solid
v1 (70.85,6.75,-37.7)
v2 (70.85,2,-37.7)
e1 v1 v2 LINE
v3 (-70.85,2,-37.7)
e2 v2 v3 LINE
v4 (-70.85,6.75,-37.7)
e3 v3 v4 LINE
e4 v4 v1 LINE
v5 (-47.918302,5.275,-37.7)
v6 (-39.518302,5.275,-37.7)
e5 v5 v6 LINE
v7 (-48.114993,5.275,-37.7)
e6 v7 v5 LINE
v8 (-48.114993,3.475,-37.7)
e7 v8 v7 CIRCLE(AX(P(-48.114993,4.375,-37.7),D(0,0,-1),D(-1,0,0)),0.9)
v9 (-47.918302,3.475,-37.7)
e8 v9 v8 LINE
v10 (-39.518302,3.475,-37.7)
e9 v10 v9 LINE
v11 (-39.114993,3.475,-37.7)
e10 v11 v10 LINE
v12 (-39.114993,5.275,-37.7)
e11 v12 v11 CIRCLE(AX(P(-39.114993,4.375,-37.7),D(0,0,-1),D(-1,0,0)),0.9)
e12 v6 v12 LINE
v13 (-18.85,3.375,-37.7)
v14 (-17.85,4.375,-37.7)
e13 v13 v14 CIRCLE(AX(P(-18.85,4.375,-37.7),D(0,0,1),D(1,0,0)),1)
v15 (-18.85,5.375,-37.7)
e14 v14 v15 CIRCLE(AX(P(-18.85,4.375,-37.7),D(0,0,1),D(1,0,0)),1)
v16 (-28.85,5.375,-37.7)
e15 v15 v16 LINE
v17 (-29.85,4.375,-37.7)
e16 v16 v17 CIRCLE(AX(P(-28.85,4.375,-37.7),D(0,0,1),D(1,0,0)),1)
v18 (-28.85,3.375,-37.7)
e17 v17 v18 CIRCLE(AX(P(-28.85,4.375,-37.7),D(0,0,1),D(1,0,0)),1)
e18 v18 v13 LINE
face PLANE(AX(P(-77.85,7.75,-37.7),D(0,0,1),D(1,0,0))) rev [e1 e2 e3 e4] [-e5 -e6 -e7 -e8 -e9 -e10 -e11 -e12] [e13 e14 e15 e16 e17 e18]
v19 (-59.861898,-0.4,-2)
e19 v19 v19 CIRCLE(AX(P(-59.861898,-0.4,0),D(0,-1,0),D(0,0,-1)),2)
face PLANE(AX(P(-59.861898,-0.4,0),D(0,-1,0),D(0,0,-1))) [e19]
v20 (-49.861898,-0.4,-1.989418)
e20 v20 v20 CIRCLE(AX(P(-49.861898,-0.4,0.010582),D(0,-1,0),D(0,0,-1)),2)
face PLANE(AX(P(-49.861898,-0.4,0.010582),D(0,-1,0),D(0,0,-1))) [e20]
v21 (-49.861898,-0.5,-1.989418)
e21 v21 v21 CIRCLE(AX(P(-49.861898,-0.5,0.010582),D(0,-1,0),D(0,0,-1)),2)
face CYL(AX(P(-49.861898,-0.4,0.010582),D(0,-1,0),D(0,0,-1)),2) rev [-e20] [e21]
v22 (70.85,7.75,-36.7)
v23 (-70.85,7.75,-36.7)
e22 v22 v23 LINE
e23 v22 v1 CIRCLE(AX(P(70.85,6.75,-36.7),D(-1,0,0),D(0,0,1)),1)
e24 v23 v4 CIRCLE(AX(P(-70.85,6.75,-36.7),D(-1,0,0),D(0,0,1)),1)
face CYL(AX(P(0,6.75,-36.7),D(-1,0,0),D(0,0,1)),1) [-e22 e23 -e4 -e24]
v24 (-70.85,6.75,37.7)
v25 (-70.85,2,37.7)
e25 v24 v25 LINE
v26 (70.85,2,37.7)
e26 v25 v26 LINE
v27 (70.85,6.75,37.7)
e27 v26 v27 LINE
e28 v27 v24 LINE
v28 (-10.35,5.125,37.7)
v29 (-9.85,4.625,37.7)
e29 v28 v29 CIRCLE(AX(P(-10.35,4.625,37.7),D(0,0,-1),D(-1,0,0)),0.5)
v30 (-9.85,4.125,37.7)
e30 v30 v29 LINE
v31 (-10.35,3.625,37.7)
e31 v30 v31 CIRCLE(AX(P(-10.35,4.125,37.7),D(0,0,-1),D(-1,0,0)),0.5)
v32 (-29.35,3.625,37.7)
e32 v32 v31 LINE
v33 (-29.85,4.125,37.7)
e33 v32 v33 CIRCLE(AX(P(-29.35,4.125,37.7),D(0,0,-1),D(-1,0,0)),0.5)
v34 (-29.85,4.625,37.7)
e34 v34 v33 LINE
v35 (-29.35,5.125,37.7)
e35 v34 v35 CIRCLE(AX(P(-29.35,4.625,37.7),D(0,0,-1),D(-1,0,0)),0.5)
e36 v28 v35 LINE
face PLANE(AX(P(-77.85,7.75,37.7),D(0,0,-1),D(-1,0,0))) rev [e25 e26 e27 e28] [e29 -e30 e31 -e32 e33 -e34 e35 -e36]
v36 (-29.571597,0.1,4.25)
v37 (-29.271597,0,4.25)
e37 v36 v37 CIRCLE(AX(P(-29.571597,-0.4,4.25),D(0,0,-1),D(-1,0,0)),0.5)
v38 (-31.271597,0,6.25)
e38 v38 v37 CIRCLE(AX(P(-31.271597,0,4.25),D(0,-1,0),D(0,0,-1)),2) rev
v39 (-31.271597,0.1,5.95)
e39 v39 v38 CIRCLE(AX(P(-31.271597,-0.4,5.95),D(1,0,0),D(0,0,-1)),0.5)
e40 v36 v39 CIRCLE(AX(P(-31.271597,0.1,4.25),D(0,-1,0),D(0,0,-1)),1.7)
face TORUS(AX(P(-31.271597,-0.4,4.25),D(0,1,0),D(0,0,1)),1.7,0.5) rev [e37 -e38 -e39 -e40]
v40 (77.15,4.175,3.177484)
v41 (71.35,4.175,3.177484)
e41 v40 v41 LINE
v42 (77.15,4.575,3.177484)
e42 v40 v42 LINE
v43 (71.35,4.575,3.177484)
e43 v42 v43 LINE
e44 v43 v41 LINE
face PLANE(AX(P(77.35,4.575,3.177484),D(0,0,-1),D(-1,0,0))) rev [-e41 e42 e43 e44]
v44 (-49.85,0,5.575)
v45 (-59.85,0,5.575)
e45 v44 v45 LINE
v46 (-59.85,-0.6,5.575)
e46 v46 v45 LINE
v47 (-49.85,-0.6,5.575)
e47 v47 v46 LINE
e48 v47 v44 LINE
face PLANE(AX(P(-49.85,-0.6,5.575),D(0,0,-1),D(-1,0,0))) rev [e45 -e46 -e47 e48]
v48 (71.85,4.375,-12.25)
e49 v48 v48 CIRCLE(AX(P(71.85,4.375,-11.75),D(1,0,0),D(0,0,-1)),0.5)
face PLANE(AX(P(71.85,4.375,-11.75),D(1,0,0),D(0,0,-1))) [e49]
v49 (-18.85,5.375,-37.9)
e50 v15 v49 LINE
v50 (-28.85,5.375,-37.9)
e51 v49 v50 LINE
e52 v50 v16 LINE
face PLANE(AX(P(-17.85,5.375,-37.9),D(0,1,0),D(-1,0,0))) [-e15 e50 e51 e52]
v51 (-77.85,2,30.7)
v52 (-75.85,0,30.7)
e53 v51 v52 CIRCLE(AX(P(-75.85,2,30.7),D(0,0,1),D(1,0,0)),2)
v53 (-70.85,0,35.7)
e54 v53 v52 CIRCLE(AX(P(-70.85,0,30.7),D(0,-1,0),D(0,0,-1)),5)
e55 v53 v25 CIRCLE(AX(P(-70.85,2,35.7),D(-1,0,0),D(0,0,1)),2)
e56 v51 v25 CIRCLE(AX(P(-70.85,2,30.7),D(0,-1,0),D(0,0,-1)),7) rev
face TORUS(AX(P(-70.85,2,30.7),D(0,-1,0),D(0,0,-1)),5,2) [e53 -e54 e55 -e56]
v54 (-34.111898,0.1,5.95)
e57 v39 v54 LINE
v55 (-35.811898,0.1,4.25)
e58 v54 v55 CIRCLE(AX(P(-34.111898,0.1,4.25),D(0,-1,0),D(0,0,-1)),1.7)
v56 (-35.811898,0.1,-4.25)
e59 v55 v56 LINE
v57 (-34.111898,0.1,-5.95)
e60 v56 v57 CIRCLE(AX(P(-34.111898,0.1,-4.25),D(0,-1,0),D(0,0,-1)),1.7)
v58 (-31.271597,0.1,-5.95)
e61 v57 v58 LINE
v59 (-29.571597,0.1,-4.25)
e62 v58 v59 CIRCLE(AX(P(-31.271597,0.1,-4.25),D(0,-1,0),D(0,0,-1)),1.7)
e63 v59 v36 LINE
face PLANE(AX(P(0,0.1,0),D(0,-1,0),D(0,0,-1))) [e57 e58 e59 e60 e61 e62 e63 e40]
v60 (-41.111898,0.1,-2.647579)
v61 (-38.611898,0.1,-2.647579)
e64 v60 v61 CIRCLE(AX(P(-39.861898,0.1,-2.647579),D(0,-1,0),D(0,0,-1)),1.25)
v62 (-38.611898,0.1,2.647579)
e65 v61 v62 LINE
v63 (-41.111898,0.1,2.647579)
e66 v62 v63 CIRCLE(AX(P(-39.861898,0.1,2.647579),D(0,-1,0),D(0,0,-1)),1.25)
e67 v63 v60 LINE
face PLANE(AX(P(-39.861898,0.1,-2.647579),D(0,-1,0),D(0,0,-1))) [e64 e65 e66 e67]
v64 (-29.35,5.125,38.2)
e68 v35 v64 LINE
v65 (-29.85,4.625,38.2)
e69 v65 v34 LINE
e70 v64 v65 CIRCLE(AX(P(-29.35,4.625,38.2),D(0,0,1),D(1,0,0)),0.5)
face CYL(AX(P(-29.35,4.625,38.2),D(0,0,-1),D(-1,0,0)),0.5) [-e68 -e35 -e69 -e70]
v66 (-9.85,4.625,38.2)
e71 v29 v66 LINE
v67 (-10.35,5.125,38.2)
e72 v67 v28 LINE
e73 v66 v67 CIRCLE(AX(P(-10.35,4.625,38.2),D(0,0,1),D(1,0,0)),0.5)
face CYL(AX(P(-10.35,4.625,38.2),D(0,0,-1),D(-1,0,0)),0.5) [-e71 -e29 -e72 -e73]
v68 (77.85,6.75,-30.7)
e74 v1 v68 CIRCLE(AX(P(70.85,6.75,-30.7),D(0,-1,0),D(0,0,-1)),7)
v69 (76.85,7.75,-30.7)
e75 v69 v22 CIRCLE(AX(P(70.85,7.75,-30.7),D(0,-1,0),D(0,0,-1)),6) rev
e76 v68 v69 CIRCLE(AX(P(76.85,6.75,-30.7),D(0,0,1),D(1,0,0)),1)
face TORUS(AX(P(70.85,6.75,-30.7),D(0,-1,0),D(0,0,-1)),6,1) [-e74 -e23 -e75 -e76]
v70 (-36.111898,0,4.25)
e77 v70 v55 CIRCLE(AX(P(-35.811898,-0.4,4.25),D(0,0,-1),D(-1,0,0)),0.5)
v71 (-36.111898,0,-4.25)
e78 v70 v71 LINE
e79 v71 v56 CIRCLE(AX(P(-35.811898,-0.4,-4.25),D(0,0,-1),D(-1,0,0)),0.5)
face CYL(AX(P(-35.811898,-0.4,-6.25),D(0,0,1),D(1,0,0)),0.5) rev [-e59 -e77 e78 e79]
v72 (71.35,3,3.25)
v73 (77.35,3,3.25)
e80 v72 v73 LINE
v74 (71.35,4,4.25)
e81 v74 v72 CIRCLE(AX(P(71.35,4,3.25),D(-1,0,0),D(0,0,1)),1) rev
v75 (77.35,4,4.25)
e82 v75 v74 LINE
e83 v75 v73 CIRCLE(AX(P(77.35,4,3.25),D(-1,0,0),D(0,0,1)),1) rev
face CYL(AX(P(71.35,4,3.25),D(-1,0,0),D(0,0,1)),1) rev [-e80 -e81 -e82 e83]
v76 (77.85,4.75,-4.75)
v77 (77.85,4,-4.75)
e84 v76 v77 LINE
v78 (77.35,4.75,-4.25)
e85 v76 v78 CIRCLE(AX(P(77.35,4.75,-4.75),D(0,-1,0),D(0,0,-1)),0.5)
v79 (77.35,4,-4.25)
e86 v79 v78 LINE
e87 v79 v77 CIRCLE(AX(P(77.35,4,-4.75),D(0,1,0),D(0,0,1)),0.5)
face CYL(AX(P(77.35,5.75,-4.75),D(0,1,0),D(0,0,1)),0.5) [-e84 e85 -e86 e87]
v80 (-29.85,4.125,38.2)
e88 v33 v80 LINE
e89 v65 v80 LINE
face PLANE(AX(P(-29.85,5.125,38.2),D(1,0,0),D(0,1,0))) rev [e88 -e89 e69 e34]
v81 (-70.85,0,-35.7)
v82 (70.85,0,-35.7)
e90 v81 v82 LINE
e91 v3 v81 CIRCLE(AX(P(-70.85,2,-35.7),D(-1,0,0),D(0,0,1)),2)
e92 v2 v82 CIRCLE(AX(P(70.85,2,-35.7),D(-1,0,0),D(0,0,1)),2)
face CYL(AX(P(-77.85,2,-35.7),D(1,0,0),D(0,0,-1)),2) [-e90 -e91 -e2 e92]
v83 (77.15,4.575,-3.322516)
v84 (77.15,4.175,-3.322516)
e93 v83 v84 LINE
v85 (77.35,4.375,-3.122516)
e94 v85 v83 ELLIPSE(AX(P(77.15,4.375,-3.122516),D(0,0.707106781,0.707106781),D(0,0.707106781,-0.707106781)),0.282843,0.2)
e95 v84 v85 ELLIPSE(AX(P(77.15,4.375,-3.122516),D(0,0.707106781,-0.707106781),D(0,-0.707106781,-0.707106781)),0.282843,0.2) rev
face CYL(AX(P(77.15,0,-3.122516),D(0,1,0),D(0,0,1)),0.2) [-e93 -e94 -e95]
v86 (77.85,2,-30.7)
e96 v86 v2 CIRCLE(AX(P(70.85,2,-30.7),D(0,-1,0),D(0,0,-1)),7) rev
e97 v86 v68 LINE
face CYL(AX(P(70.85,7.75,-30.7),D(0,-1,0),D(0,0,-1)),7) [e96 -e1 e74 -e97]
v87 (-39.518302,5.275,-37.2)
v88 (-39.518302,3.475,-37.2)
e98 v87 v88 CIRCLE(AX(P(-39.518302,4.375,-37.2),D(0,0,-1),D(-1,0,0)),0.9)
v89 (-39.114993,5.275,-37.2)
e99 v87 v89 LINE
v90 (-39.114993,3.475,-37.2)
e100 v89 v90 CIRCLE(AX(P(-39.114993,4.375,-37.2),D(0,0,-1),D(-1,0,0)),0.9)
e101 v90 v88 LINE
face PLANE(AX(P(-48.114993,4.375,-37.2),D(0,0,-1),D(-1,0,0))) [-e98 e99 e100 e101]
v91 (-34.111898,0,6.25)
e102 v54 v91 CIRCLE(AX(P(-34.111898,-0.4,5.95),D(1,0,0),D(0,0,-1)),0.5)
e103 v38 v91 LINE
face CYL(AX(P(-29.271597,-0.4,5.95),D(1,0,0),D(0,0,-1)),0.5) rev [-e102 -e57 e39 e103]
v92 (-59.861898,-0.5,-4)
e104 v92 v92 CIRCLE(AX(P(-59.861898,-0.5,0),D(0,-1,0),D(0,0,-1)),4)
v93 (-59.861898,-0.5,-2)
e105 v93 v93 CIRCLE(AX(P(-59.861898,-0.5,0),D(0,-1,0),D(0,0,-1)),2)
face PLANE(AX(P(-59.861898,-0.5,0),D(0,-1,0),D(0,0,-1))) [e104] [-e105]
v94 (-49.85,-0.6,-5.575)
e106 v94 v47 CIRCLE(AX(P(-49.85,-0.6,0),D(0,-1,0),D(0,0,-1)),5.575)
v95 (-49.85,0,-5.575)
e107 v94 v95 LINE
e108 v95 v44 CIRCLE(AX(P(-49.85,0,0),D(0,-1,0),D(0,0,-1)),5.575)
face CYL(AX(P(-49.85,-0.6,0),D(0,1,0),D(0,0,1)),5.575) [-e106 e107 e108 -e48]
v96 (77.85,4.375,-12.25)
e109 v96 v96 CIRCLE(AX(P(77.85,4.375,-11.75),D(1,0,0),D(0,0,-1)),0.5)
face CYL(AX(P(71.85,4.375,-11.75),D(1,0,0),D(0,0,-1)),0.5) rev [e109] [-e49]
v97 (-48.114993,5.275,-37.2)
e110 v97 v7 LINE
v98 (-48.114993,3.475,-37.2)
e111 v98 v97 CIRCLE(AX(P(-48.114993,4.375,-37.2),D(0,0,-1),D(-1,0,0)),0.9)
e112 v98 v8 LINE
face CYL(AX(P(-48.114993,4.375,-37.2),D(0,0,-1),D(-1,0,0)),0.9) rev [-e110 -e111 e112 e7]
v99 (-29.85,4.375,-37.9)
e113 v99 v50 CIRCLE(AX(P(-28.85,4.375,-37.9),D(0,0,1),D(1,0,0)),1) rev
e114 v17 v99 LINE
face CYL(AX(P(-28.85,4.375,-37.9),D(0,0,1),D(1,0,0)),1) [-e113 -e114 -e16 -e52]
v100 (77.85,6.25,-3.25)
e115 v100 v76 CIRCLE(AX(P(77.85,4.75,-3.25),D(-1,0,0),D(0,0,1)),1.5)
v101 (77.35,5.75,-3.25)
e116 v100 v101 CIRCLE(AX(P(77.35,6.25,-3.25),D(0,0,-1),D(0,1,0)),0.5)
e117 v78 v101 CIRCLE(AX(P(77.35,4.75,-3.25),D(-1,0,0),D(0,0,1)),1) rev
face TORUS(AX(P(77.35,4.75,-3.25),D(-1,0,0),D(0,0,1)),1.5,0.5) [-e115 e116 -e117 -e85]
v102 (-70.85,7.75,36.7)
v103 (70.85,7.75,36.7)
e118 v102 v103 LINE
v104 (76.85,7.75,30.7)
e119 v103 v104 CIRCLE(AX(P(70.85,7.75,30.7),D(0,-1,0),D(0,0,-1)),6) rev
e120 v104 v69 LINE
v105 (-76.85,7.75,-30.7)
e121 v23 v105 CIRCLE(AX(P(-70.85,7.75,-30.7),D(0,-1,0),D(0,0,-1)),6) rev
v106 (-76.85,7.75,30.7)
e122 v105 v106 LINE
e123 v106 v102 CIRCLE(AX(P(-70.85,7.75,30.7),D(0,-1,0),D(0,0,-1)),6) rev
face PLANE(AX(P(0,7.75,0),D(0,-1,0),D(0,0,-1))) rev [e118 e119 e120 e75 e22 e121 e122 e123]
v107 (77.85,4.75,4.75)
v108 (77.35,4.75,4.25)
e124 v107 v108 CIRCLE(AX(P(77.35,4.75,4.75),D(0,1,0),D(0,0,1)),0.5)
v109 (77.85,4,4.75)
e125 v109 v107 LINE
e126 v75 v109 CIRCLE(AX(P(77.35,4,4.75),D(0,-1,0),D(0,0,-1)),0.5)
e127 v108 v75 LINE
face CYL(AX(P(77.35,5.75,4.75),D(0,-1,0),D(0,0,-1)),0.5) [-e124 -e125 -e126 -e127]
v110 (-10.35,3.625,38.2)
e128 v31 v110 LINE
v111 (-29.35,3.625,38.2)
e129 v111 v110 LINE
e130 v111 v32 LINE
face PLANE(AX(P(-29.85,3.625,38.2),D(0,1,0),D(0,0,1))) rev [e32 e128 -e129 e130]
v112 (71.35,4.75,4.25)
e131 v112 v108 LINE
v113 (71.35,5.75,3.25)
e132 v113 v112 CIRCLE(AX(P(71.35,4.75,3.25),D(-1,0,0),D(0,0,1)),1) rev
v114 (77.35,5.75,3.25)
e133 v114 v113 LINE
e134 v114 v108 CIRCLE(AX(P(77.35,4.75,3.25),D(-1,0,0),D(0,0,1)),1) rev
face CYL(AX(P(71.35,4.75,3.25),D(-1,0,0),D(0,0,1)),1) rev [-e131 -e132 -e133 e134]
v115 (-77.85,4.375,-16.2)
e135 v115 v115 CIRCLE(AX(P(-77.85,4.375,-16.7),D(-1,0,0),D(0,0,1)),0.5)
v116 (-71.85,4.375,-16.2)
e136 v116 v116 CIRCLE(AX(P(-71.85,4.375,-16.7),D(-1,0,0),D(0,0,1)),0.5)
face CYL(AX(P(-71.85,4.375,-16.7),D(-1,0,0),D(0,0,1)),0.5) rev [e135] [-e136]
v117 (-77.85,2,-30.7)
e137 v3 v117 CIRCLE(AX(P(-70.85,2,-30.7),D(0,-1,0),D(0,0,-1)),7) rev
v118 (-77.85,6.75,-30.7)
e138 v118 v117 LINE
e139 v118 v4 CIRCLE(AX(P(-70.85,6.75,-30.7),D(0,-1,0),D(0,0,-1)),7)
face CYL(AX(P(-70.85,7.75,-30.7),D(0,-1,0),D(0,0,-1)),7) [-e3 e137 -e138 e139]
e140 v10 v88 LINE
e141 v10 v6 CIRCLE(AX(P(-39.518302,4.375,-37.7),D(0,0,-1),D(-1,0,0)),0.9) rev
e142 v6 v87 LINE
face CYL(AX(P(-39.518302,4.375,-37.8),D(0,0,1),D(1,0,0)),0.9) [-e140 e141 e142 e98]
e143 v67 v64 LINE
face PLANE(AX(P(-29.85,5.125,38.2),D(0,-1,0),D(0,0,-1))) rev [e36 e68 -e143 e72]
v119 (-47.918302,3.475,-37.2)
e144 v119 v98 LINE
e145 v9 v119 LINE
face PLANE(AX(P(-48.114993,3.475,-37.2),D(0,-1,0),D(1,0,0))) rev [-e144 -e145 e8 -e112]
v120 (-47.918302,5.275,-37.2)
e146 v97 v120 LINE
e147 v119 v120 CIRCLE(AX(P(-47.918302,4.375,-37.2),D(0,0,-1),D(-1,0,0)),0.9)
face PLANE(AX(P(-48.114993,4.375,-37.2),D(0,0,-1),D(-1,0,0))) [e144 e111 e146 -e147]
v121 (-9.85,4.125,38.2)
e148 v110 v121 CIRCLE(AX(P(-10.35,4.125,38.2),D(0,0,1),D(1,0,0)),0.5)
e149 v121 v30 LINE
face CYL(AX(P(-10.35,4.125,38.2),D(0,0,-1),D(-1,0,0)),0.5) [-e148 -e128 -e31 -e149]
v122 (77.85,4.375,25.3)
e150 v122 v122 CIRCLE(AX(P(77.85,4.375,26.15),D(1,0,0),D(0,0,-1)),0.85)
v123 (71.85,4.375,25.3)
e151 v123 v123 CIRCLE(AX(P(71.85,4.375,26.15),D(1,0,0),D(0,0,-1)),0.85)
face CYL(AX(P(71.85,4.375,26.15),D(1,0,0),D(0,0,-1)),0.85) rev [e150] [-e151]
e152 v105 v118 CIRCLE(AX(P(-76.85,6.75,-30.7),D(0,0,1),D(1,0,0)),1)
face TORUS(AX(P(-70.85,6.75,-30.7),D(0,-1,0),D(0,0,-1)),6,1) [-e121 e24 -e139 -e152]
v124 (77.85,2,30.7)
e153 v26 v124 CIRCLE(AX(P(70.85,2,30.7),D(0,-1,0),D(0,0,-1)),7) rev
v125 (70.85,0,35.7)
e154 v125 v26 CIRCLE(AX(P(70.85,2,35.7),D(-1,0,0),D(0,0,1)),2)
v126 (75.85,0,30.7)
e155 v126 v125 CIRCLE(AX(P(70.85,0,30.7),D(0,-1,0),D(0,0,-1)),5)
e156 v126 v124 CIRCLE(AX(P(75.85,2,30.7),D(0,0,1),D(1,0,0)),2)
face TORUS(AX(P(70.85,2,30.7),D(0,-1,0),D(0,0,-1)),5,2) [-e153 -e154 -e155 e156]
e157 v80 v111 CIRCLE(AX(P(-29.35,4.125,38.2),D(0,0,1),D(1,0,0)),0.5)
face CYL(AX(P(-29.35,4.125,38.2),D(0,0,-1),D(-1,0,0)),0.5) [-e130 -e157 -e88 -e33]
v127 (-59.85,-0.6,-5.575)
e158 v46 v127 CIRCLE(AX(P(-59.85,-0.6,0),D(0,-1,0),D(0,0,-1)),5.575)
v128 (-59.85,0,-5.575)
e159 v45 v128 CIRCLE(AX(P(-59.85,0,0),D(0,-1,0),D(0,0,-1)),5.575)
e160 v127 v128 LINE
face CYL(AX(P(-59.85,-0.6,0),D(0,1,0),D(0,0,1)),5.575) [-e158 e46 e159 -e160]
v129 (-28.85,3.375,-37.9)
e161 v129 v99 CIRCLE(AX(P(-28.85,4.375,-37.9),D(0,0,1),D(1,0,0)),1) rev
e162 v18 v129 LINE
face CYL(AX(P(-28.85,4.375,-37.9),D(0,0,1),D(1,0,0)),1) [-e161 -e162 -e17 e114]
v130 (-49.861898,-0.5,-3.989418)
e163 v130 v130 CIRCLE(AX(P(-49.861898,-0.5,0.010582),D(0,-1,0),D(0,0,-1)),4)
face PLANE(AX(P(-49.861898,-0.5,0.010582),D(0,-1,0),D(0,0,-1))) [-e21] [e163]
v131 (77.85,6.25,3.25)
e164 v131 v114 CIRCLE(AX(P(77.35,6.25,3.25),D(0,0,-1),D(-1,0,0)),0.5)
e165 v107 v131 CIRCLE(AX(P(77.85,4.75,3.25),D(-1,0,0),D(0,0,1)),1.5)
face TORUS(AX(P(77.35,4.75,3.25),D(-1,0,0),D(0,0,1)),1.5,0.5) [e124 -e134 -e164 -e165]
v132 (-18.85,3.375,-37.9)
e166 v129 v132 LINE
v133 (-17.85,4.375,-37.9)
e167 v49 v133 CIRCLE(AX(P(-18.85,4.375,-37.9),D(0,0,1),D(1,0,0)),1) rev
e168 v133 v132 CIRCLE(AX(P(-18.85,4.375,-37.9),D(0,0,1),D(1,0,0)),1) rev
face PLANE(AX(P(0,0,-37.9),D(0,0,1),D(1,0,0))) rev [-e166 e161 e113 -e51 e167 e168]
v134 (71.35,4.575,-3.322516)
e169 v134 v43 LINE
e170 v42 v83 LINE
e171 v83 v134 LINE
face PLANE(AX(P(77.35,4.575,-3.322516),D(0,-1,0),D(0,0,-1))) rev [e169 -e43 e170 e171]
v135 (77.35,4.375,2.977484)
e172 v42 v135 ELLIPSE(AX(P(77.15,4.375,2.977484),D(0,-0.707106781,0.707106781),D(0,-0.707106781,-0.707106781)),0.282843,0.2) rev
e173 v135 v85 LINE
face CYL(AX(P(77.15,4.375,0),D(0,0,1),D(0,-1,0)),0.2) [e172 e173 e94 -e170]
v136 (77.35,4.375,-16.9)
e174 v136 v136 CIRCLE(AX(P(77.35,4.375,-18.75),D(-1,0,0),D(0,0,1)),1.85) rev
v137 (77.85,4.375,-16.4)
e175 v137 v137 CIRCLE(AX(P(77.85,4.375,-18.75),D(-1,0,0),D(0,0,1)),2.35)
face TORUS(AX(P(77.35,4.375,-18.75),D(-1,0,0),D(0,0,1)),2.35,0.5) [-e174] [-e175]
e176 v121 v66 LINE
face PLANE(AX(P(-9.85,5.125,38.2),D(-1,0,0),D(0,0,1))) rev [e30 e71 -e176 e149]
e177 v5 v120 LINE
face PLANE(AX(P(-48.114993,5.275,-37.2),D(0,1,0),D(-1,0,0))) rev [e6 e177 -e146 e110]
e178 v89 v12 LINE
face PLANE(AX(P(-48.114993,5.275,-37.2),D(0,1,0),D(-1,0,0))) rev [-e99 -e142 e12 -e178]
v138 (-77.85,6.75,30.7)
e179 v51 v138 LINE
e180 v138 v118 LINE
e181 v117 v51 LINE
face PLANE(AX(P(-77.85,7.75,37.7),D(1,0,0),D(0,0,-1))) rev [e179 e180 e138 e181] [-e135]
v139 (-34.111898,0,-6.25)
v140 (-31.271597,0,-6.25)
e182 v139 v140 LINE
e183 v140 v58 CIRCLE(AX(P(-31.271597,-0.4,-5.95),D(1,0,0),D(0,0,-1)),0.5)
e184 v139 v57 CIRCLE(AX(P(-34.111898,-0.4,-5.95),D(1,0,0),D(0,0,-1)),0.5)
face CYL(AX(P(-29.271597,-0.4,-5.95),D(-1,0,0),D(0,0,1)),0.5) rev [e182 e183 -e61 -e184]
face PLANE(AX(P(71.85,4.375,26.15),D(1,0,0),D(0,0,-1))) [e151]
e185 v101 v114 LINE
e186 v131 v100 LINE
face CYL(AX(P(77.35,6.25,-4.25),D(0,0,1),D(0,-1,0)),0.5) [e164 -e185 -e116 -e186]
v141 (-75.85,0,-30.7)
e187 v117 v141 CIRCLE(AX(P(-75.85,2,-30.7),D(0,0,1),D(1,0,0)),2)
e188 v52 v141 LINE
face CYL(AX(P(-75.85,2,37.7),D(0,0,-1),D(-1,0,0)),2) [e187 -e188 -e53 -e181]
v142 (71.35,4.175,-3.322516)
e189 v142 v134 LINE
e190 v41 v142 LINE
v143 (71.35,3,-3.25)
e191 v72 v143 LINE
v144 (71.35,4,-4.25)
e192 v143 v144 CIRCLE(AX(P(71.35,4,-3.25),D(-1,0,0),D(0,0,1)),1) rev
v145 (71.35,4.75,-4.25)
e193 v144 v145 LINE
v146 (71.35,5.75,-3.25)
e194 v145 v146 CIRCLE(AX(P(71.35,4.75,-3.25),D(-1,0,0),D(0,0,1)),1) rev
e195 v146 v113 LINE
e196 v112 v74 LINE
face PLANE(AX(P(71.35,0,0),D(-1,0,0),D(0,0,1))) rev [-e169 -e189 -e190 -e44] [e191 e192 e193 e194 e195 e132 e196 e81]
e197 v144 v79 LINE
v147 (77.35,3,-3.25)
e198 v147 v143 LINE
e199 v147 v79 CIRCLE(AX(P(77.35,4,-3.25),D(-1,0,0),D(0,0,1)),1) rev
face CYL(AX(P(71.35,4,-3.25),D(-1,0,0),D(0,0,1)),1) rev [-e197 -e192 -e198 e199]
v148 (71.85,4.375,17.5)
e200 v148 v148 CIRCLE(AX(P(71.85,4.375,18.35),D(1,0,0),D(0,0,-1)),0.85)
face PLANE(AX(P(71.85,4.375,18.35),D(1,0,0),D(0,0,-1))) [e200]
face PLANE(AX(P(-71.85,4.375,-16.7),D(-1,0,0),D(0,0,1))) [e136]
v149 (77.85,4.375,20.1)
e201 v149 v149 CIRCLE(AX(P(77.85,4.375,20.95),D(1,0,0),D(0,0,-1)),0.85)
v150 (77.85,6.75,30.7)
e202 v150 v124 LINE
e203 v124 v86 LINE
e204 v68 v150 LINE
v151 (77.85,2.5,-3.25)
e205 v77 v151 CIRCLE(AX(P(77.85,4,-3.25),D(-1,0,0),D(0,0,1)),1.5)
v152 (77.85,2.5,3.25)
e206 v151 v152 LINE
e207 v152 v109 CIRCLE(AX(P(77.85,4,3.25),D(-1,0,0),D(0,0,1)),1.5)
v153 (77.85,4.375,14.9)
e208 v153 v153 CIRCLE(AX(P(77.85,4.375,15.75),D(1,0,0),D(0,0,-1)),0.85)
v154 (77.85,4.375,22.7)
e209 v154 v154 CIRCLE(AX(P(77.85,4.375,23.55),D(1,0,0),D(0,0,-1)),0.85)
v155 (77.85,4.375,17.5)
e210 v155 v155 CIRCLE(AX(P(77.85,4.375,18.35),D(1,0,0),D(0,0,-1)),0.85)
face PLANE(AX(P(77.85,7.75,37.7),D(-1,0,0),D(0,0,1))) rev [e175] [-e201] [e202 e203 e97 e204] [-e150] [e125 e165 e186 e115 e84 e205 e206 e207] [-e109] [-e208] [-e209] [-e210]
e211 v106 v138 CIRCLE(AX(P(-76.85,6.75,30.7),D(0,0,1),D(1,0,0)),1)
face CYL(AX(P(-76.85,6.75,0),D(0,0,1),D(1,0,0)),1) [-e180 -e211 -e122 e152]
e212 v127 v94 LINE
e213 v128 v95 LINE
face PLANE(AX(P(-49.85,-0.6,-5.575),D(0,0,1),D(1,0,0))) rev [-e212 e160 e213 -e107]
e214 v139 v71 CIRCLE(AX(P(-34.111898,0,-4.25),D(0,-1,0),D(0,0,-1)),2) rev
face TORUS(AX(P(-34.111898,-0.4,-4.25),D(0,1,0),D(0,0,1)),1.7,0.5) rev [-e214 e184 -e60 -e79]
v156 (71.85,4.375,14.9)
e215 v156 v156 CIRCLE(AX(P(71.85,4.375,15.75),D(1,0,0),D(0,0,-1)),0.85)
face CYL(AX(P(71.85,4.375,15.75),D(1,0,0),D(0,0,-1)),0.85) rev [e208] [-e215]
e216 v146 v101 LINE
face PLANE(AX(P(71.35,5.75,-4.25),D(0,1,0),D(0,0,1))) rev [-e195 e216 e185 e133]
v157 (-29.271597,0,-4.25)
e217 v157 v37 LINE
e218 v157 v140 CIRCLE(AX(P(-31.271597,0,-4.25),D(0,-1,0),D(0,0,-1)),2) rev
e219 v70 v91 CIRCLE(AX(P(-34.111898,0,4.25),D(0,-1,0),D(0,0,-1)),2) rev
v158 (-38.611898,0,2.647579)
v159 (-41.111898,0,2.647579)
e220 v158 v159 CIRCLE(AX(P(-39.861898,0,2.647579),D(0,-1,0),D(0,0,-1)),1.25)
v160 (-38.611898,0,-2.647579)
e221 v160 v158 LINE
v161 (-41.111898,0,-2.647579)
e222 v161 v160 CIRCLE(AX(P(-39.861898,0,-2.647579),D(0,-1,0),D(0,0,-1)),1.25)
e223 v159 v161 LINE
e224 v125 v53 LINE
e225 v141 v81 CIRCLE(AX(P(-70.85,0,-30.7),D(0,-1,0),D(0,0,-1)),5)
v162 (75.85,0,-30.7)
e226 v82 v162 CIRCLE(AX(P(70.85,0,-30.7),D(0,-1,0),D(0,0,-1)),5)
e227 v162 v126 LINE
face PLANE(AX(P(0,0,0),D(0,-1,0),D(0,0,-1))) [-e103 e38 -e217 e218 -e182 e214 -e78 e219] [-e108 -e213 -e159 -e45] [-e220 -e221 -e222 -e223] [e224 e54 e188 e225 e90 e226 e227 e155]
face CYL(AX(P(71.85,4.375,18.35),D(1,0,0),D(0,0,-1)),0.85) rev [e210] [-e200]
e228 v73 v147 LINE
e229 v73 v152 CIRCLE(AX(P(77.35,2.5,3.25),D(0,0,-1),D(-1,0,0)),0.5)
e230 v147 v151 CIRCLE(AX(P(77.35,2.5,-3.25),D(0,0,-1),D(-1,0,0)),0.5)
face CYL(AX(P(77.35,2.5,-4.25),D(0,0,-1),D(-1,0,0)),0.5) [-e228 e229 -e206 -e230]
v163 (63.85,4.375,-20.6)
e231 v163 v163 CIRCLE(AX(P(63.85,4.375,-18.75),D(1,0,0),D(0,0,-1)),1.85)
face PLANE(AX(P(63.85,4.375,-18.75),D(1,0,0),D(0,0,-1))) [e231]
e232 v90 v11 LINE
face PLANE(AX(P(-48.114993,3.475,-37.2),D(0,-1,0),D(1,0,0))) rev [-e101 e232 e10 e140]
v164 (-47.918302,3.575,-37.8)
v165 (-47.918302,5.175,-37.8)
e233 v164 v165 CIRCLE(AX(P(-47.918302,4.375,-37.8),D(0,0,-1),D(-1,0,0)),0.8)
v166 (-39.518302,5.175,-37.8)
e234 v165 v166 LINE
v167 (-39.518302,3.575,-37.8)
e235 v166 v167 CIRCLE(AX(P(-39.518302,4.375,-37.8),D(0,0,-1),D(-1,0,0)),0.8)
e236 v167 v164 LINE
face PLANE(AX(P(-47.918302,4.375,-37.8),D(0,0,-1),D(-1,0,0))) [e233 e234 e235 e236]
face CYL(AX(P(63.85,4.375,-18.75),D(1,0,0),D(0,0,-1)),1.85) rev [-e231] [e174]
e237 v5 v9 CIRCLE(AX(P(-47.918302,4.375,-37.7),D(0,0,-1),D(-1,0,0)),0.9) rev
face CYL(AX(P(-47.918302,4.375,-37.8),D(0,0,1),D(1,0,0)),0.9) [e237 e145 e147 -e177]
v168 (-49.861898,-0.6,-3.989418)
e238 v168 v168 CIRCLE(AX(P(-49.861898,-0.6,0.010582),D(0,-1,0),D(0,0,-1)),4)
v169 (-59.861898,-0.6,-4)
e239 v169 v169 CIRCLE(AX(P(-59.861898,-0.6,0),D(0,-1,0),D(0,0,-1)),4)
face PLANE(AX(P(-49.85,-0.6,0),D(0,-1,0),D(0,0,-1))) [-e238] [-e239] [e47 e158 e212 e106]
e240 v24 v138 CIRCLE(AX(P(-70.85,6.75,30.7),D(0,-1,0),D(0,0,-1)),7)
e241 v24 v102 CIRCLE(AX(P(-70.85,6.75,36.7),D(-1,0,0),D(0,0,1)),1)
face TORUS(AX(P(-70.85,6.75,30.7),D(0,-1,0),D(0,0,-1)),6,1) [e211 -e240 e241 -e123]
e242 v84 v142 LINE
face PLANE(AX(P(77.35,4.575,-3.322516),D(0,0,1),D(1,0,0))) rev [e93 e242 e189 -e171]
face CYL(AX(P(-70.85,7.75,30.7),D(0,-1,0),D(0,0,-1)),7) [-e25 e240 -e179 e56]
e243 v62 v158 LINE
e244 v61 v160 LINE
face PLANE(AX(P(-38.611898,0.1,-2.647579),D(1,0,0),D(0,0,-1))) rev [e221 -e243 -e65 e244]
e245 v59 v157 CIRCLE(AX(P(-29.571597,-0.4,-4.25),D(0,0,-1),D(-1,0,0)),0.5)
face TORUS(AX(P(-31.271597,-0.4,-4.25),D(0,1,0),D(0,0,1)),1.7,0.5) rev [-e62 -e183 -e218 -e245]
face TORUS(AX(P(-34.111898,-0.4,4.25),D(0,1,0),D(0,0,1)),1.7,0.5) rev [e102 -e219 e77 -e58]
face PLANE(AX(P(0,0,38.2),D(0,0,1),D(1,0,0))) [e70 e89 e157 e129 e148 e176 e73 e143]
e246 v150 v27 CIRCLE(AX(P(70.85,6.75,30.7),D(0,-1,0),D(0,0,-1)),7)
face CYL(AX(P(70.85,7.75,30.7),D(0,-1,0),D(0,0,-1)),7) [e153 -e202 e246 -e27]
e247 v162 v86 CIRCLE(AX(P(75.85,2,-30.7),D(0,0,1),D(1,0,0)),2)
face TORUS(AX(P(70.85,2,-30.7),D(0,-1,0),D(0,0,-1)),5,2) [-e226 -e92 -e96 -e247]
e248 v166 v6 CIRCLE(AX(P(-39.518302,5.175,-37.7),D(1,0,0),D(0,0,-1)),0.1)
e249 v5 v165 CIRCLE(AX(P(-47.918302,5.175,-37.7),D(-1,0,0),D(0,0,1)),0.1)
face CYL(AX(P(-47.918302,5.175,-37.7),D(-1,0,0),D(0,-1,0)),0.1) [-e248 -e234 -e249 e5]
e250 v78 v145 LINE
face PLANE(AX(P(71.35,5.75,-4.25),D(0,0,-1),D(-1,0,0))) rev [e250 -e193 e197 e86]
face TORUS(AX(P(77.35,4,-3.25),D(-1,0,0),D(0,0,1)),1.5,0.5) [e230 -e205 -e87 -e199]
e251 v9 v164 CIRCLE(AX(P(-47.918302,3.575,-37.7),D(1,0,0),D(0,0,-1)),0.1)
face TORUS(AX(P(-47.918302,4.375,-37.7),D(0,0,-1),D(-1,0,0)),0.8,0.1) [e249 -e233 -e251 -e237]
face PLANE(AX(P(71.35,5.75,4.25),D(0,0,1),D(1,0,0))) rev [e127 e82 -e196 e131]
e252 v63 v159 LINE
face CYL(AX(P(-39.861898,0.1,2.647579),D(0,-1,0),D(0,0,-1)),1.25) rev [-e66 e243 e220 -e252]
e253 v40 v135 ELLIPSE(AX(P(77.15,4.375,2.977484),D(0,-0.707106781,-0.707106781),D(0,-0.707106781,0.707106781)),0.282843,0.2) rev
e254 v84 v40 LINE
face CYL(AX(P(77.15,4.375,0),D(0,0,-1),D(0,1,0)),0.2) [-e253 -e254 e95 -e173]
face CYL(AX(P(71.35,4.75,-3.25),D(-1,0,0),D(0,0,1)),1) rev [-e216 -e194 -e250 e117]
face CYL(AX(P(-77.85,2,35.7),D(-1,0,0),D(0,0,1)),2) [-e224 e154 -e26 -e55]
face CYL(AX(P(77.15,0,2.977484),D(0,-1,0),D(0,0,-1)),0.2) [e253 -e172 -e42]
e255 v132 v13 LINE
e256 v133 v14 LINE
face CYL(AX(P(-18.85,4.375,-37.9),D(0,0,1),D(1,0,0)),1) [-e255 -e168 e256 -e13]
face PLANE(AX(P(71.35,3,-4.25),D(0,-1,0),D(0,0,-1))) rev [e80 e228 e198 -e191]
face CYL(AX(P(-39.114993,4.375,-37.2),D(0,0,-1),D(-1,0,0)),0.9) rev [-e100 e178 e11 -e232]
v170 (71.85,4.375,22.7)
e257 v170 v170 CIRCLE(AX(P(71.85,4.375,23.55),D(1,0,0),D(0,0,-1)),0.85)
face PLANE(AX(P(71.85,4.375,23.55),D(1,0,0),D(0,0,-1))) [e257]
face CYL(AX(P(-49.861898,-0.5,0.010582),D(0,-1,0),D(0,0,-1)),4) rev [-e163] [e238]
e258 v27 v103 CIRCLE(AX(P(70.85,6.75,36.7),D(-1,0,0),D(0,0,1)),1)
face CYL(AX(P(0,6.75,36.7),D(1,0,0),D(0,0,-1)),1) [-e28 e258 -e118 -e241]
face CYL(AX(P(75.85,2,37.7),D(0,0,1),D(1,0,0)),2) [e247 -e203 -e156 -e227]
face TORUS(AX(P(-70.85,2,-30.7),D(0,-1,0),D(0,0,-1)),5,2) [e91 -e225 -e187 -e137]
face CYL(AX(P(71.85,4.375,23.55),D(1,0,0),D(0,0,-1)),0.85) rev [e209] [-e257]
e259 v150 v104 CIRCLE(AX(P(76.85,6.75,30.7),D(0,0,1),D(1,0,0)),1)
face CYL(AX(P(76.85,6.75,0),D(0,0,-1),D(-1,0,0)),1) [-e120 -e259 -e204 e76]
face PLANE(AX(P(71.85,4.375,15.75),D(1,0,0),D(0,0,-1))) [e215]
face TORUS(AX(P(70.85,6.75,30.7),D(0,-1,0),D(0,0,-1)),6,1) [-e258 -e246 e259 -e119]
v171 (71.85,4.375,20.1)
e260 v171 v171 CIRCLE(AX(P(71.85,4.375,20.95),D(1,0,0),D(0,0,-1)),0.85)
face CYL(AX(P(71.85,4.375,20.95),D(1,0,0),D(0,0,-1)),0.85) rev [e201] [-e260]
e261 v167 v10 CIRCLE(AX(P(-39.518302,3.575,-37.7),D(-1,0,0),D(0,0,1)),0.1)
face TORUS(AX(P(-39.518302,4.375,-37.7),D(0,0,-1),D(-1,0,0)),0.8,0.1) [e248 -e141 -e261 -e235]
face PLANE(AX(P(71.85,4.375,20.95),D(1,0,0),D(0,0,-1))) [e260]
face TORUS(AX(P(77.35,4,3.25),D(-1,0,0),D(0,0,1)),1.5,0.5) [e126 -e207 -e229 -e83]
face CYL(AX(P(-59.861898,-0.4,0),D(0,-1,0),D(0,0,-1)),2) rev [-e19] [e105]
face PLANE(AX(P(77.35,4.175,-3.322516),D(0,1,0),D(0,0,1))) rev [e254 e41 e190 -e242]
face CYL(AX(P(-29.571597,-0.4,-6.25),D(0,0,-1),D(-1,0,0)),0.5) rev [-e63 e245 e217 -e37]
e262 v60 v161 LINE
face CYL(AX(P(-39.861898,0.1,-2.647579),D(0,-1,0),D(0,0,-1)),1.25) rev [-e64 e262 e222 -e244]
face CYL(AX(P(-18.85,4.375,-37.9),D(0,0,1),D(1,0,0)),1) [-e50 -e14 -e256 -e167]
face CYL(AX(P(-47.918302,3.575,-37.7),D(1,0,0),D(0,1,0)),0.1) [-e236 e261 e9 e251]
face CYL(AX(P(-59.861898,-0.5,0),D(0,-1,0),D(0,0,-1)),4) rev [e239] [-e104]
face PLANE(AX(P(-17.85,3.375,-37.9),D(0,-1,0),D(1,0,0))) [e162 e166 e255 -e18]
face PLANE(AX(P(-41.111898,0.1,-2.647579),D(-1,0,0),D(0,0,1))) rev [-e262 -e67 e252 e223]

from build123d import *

# Parameters (mm, degrees)
SKETCH1_W                = 155.7
SKETCH1_H                = 75.4
BOSS_EXTRUDE1_DEPTH      = 7.75
FILLET1_R                = 7
FILLET2_R                = 1
FILLET3_R                = 2
BOSS_EXTRUDE2_DEPTH      = 0.6
SKETCH3_R                = 4
CUT_EXTRUDE1_DEPTH       = 0.1
SKETCH4_R                = 2
CUT_EXTRUDE2_DEPTH       = 0.1
CUT_EXTRUDE3_DEPTH       = 0.1
SKETCH6_W                = 6.840301521
SKETCH6_H                = 12.5
CUT_EXTRUDE4_DEPTH       = 0.1
FILLET4_R                = 2
FILLET5_R                = 0.5
BOSS_EXTRUDE3_DEPTH      = 0.2
BOSS_EXTRUDE3_DEPTH_BACK = 0.2
SKETCH7_W                = 12
SKETCH7_H                = 2
FILLET6_R                = 1
CUT_EXTRUDE5_DEPTH       = 0.5
BOSS_EXTRUDE4_DEPTH      = 0.6
FILLET7_R                = 0.1
SKETCH11_W               = 8.5
SKETCH11_H               = 2.75
CUT_EXTRUDE6_DEPTH       = 6.5
FILLET8_R                = 1
SKETCH12_W               = 6.5
SKETCH12_H               = 0.4
BOSS_EXTRUDE5_DEPTH      = 6
FILLET9_R                = 0.5
SKETCH13_R               = 0.85
CUT_EXTRUDE7_DEPTH       = 6
SKETCH14_R               = 1.85
CUT_EXTRUDE8_DEPTH       = 14
FILLET10_R               = 0.5
FILLET12_R               = 0.2
SKETCH15_R               = 0.5
CUT_EXTRUDE9_DEPTH       = 6
SKETCH16_R               = 0.5
CUT_EXTRUDE10_DEPTH      = 6
SKETCH18_W               = 20
SKETCH18_H               = 1.5
BOSS_EXTRUDE6_DEPTH      = 0.5
FILLET14_R               = 0.5


# Some blends are built 0.0001 mm under size
with BuildPart() as part:
    # Sketch1 → Boss-Extrude1 (new body)
    with BuildSketch(Plane(origin=(0, 0, 0), x_dir=(1, 0, 0), z_dir=(0, 1, 0))):
        Rectangle(SKETCH1_W, SKETCH1_H)
    extrude(amount=BOSS_EXTRUDE1_DEPTH)

    # Fillet1
    fillet1_edges = [part.edges().sort_by_distance(p)[0] for p in [
        (77.85, 3.875, 37.7),
        (-77.85, 3.875, 37.7),
        (-77.85, 3.875, -37.7),
        (77.85, 3.875, -37.7),
    ]]
    fillet(fillet1_edges, radius=FILLET1_R)

    # Fillet2
    fillet2_edges = [part.edges().sort_by_distance(p)[0] for p in [
        (-77.85, 7.75, 0),
        (0, 7.75, -37.7),
        (77.85, 7.75, 0),
        (0, 7.75, 37.7),
        (-75.799747468, 7.75, 35.649747468),
        (75.799747468, 7.75, 35.649747468),
        (75.799747468, 7.75, -35.649747468),
        (-75.799747468, 7.75, -35.649747468),
    ]]
    fillet(fillet2_edges, radius=FILLET2_R)

    # Fillet3
    fillet3_edges = [part.edges().sort_by_distance(p)[0] for p in [
        (-77.85, 0, 0),
        (77.85, 0, 0),
        (0, 0, 37.7),
        (0, 0, -37.7),
        (-75.799747468, 0, 35.649747468),
        (75.799747468, 0, 35.649747468),
        (75.799747468, 0, -35.649747468),
        (-75.799747468, 0, -35.649747468),
    ]]
    fillet(fillet3_edges, radius=FILLET3_R)

    # Sketch2 → Boss-Extrude2 (add)
    with BuildSketch(Plane.XZ):
        with BuildLine():
            Line((-49.85, -5.575), (-59.85, -5.575))
            ThreePointArc((-59.85, -5.575), (-65.425, 0), (-59.85, 5.575))
            Line((-59.85, 5.575), (-49.85, 5.575))
            ThreePointArc((-49.85, 5.575), (-44.275, 0), (-49.85, -5.575))
        make_face()
    extrude(amount=BOSS_EXTRUDE2_DEPTH)

    # Sketch3 → Cut-Extrude1 (cut)
    with BuildSketch(Plane.XZ.offset(0.6)):
        with Locations(Location((-49.86189839, 0.010581739, 0), (0, 0, 270))):
            Circle(SKETCH3_R)
        with Locations(Location((-59.86189839, 0, 0), (0, 0, 270))):
            Circle(SKETCH3_R)
    extrude(amount=-CUT_EXTRUDE1_DEPTH, mode=Mode.SUBTRACT)

    # Sketch4 → Cut-Extrude2 (cut)
    with BuildSketch(Plane.XZ.offset(0.5)):
        with Locations(Location((-49.86189839, 0.010581739, 0), (0, 0, 270))):
            Circle(SKETCH4_R)
        with Locations(Location((-59.86189839, 0, 0), (0, 0, 270))):
            Circle(SKETCH4_R)
    extrude(amount=-CUT_EXTRUDE2_DEPTH, mode=Mode.SUBTRACT)

    # Sketch5 → Cut-Extrude3 (cut)
    with BuildSketch(Plane.XZ):
        with BuildLine():
            Line((-41.11189839, -2.647579151), (-41.11189839, 2.647579151))
            ThreePointArc((-41.11189839, 2.647579151), (-39.86189839, 3.897579151), (-38.61189839, 2.647579151))
            Line((-38.61189839, 2.647579151), (-38.61189839, -2.647579151))
            ThreePointArc((-38.61189839, -2.647579151), (-39.86189839, -3.897579151), (-41.11189839, -2.647579151))
        make_face()
    extrude(amount=-CUT_EXTRUDE3_DEPTH, mode=Mode.SUBTRACT)

    # Sketch6 → Cut-Extrude4 (cut)
    with BuildSketch(Plane.XZ):
        with Locations((-32.69174763, 0)):
            Rectangle(SKETCH6_W, SKETCH6_H)
    extrude(amount=-CUT_EXTRUDE4_DEPTH, mode=Mode.SUBTRACT)

    # Fillet4
    fillet4_edges = [part.edges().sort_by_distance(p)[0] for p in [
        (-36.11189839, 0.05, -6.25),
        (-36.11189839, 0.05, 6.25),
        (-29.271596869, 0.05, 6.25),
        (-29.271596869, 0.05, -6.25),
    ]]
    fillet(fillet4_edges, radius=FILLET4_R)

    # Fillet5
    # the kernel refuses this fillet: 0.5 mm, written as the material it adds along each edge
    with BuildSketch(Plane(origin=(-34.11189839, 0.1, 4.25), x_dir=(-1, 0, 0), z_dir=(0, 0, -1))) as fillet5_piece_1:
        with BuildLine():
            CenterArc((1.7, -0.5), FILLET5_R, 53.130102354, 36.869897646)
            Line((1.7, 0), (1.7, 0.01))
            Line((1.7, 0.01), (2, 0.01))
            Line((2, 0.01), (2.01, 0))
            ThreePointArc((2.01, 0), (2.01, -0.05), (2.006, -0.092))
            Line((2.006, -0.092), (2, -0.1))
        make_face()
    revolve(axis=Axis((-34.11189839, 0.1, 4.25), (0, 1, 0)), revolution_arc=90)
    with BuildSketch(Plane(origin=(-34.11189839, 0.1, 6.25), x_dir=(0, -1, 0), z_dir=(1, 0, 0)), Plane(origin=(-31.271596869, 0.1, -6.25), x_dir=(0, -1, 0), z_dir=(-1, 0, 0))) as fillet5_piece_2:
        with BuildLine():
            CenterArc((0.5, 0.3), FILLET5_R, 180, 36.869897646)
            Line((0, 0.3), (-0.01, 0.3))
            Line((-0.01, 0.3), (-0.01, 0))
            Line((-0.01, 0), (0, -0.01))
            ThreePointArc((0, -0.01), (0.05, -0.01), (0.092, -0.006))
            Line((0.092, -0.006), (0.1, 0))
        make_face()
    extrude(amount=2.84030152)
    with BuildSketch(Plane(origin=(-31.271596869, 0.1, 4.25), x_dir=(0, 0, 1), z_dir=(-1, 0, 0))) as fillet5_piece_3:
        with BuildLine():
            CenterArc((1.7, -0.5), FILLET5_R, 53.130102354, 36.869897646)
            Line((1.7, 0), (1.7, 0.01))
            Line((1.7, 0.01), (2, 0.01))
            Line((2, 0.01), (2.01, 0))
            ThreePointArc((2.01, 0), (2.01, -0.05), (2.006, -0.092))
            Line((2.006, -0.092), (2, -0.1))
        make_face()
    revolve(axis=Axis((-31.271596869, 0.1, 4.25), (0, 1, 0)), revolution_arc=90)
    with BuildSketch(Plane(origin=(-29.271596869, 0.1, 4.25), x_dir=(0, -1, 0), z_dir=(0, 0, -1)), Plane(origin=(-36.11189839, 0.1, -4.25), x_dir=(0, -1, 0), z_dir=(0, 0, 1))) as fillet5_piece_4:
        with BuildLine():
            CenterArc((0.5, 0.3), FILLET5_R, 180, 36.869897646)
            Line((0, 0.3), (-0.01, 0.3))
            Line((-0.01, 0.3), (-0.01, 0))
            Line((-0.01, 0), (0, -0.01))
            ThreePointArc((0, -0.01), (0.05, -0.01), (0.092, -0.006))
            Line((0.092, -0.006), (0.1, 0))
        make_face()
    extrude(amount=8.5)
    with BuildSketch(Plane(origin=(-31.271596869, 0.1, -4.25), x_dir=(0, 0, -1), z_dir=(-1, 0, 0))) as fillet5_piece_5:
        with BuildLine():
            CenterArc((1.7, 0.5), FILLET5_R, 270, 36.869897646)
            Line((1.7, 0), (1.7, -0.01))
            Line((1.7, -0.01), (2, -0.01))
            Line((2, -0.01), (2.01, 0))
            ThreePointArc((2.01, 0), (2.01, 0.05), (2.006, 0.092))
            Line((2.006, 0.092), (2, 0.1))
        make_face()
    revolve(axis=Axis((-31.271596869, 0.1, -4.25), (0, -1, 0)), revolution_arc=90)
    with BuildSketch(Plane(origin=(-34.11189839, 0.1, -4.25), x_dir=(0, 0, -1), z_dir=(1, 0, 0))) as fillet5_piece_6:
        with BuildLine():
            CenterArc((1.7, -0.5), FILLET5_R, 53.130102354, 36.869897646)
            Line((1.7, 0), (1.7, 0.01))
            Line((1.7, 0.01), (2, 0.01))
            Line((2, 0.01), (2.01, 0))
            ThreePointArc((2.01, 0), (2.01, -0.05), (2.006, -0.092))
            Line((2.006, -0.092), (2, -0.1))
        make_face()
    revolve(axis=Axis((-34.11189839, 0.1, -4.25), (0, 1, 0)), revolution_arc=90)

    # Sketch7 → Boss-Extrude3 (add, two sides: drawn at the far end of the back side and taken through both)
    with BuildSketch(Plane.XY.offset(-37.7).offset(-BOSS_EXTRUDE3_DEPTH_BACK)):
        with Locations((-23.85, 4.375)):
            Rectangle(SKETCH7_W, SKETCH7_H)
    extrude(amount=BOSS_EXTRUDE3_DEPTH + BOSS_EXTRUDE3_DEPTH_BACK)

    # Fillet6
    fillet6_edges = [part.edges().sort_by_distance(p)[0] for p in [
        (-17.85, 3.375, -37.8),
        (-17.85, 5.375, -37.8),
        (-29.85, 3.375, -37.8),
        (-29.85, 5.375, -37.8),
    ]]
    fillet(fillet6_edges, radius=FILLET6_R - 0.0001)  # a hair under: the kernel refuses the full size

    # Sketch8 → Cut-Extrude5 (cut)
    with BuildSketch(Plane(origin=(0, 0, -37.7), x_dir=(-1, 0, 0), z_dir=(0, 0, -1))):
        with BuildLine():
            Line((48.114993193, 3.475), (39.114993193, 3.475))
            ThreePointArc((39.114993193, 3.475), (38.214993193, 4.375), (39.114993193, 5.275))
            Line((39.114993193, 5.275), (48.114993193, 5.275))
            ThreePointArc((48.114993193, 5.275), (49.014993193, 4.375), (48.114993193, 3.475))
        make_face()
    extrude(amount=-CUT_EXTRUDE5_DEPTH, mode=Mode.SUBTRACT)

    # Sketch9 → Boss-Extrude4 (add)
    with BuildSketch(Plane(origin=(0, 0, -37.2), x_dir=(-1, 0, 0), z_dir=(0, 0, -1))):
        with BuildLine():
            Line((47.918302414, 3.475), (39.518302414, 3.475))
            ThreePointArc((39.518302414, 3.475), (38.618302414, 4.375), (39.518302414, 5.275))
            Line((39.518302414, 5.275), (47.918302414, 5.275))
            ThreePointArc((47.918302414, 5.275), (48.818302414, 4.375), (47.918302414, 3.475))
        make_face()
    extrude(amount=BOSS_EXTRUDE4_DEPTH)

    # Fillet7
    fillet7_edges = [part.edges().sort_by_distance(p)[0] for p in [
        (-43.718302414, 3.475, -37.8),
        (-38.618302414, 4.375, -37.8),
        (-43.718302414, 5.275, -37.8),
        (-48.818302414, 4.375, -37.8),
    ]]
    fillet(fillet7_edges, radius=FILLET7_R - 0.0001)  # a hair under: the kernel refuses the full size

    # Sketch11 → Cut-Extrude6 (cut)
    with BuildSketch(Plane(origin=(77.85, 0, 0), x_dir=(0, 0, -1), z_dir=(1, 0, 0))):
        with Locations((0, 4.375)):
            Rectangle(SKETCH11_W, SKETCH11_H)
    extrude(amount=-CUT_EXTRUDE6_DEPTH, mode=Mode.SUBTRACT)

    # Fillet8
    fillet8_edges = [part.edges().sort_by_distance(p)[0] for p in [
        (74.6, 3, 4.25),
        (74.6, 5.75, 4.25),
        (74.6, 5.75, -4.25),
        (74.6, 3, -4.25),
    ]]
    fillet(fillet8_edges, radius=FILLET8_R)

    # Sketch12 → Boss-Extrude5 (add)
    with BuildSketch(Plane(origin=(71.35, 0, 0), x_dir=(0, 0, -1), z_dir=(1, 0, 0))):
        with Locations((0.072516481, 4.375)):
            Rectangle(SKETCH12_W, SKETCH12_H)
    extrude(amount=BOSS_EXTRUDE5_DEPTH)

    # Fillet9
    fillet9_edges = [part.edges().sort_by_distance(p)[0] for p in [
        (77.85, 4.375, 4.25),
        (77.85, 5.75, 0),
        (77.85, 4.375, -4.25),
        (77.85, 3, 0),
        (77.85, 5.457106781, 3.957106781),
        (77.85, 5.457106781, -3.957106781),
        (77.85, 3.292893219, 3.957106781),
        (77.85, 3.292893219, -3.957106781),
    ]]
    fillet(fillet9_edges, radius=FILLET9_R)

    # Sketch13 → Cut-Extrude7 (cut)
    with BuildSketch(Plane(origin=(77.85, 0, 0), x_dir=(0, 0, -1), z_dir=(1, 0, 0))):
        with Locations((-15.75, 4.375)):
            Circle(SKETCH13_R)
        with Locations((-18.35, 4.375)):
            Circle(SKETCH13_R)
        with Locations((-20.95, 4.375)):
            Circle(SKETCH13_R)
        with Locations((-23.55, 4.375)):
            Circle(SKETCH13_R)
        with Locations((-26.15, 4.375)):
            Circle(SKETCH13_R)
    extrude(amount=-CUT_EXTRUDE7_DEPTH, mode=Mode.SUBTRACT)

    # Sketch14 → Cut-Extrude8 (cut)
    with BuildSketch(Plane(origin=(77.85, 0, 0), x_dir=(0, 0, -1), z_dir=(1, 0, 0))):
        with Locations((18.75, 4.375)):
            Circle(SKETCH14_R)
    extrude(amount=-CUT_EXTRUDE8_DEPTH, mode=Mode.SUBTRACT)

    # Fillet10
    fillet10_edges = [part.edges().sort_by_distance(p)[0] for p in [
        (77.85, 4.375, -16.9),
    ]]
    fillet(fillet10_edges, radius=FILLET10_R)

    # Fillet12
    fillet12_edges = [part.edges().sort_by_distance(p)[0] for p in [
        (77.35, 4.375, 3.177483519),
        (77.35, 4.175, -0.072516481),
        (77.35, 4.375, -3.322516481),
        (77.35, 4.575, -0.072516481),
    ]]
    fillet(fillet12_edges, radius=FILLET12_R - 0.0001)  # a hair under: the kernel refuses the full size

    # Sketch15 → Cut-Extrude9 (cut)
    with BuildSketch(Plane(origin=(77.85, 0, 0), x_dir=(0, 0, -1), z_dir=(1, 0, 0))):
        with Locations((11.75, 4.375)):
            Circle(SKETCH15_R)
    extrude(amount=-CUT_EXTRUDE9_DEPTH, mode=Mode.SUBTRACT)

    # Sketch16 → Cut-Extrude10 (cut)
    with BuildSketch(Plane.ZY.offset(77.85)):
        with Locations((-16.7, 4.375)):
            Circle(SKETCH16_R)
    extrude(amount=-CUT_EXTRUDE10_DEPTH, mode=Mode.SUBTRACT)

    # Sketch18 → Boss-Extrude6 (add)
    with BuildSketch(Plane.XY.offset(37.7)):
        with Locations((-19.85, 4.375)):
            Rectangle(SKETCH18_W, SKETCH18_H)
    extrude(amount=BOSS_EXTRUDE6_DEPTH)

    # Fillet14
    fillet14_edges = [part.edges().sort_by_distance(p)[0] for p in [
        (-9.85, 3.625, 37.95),
        (-9.85, 5.125, 37.95),
        (-29.85, 5.125, 37.95),
        (-29.85, 3.625, 37.95),
    ]]
    fillet(fillet14_edges, radius=FILLET14_R)


solid = part.part
